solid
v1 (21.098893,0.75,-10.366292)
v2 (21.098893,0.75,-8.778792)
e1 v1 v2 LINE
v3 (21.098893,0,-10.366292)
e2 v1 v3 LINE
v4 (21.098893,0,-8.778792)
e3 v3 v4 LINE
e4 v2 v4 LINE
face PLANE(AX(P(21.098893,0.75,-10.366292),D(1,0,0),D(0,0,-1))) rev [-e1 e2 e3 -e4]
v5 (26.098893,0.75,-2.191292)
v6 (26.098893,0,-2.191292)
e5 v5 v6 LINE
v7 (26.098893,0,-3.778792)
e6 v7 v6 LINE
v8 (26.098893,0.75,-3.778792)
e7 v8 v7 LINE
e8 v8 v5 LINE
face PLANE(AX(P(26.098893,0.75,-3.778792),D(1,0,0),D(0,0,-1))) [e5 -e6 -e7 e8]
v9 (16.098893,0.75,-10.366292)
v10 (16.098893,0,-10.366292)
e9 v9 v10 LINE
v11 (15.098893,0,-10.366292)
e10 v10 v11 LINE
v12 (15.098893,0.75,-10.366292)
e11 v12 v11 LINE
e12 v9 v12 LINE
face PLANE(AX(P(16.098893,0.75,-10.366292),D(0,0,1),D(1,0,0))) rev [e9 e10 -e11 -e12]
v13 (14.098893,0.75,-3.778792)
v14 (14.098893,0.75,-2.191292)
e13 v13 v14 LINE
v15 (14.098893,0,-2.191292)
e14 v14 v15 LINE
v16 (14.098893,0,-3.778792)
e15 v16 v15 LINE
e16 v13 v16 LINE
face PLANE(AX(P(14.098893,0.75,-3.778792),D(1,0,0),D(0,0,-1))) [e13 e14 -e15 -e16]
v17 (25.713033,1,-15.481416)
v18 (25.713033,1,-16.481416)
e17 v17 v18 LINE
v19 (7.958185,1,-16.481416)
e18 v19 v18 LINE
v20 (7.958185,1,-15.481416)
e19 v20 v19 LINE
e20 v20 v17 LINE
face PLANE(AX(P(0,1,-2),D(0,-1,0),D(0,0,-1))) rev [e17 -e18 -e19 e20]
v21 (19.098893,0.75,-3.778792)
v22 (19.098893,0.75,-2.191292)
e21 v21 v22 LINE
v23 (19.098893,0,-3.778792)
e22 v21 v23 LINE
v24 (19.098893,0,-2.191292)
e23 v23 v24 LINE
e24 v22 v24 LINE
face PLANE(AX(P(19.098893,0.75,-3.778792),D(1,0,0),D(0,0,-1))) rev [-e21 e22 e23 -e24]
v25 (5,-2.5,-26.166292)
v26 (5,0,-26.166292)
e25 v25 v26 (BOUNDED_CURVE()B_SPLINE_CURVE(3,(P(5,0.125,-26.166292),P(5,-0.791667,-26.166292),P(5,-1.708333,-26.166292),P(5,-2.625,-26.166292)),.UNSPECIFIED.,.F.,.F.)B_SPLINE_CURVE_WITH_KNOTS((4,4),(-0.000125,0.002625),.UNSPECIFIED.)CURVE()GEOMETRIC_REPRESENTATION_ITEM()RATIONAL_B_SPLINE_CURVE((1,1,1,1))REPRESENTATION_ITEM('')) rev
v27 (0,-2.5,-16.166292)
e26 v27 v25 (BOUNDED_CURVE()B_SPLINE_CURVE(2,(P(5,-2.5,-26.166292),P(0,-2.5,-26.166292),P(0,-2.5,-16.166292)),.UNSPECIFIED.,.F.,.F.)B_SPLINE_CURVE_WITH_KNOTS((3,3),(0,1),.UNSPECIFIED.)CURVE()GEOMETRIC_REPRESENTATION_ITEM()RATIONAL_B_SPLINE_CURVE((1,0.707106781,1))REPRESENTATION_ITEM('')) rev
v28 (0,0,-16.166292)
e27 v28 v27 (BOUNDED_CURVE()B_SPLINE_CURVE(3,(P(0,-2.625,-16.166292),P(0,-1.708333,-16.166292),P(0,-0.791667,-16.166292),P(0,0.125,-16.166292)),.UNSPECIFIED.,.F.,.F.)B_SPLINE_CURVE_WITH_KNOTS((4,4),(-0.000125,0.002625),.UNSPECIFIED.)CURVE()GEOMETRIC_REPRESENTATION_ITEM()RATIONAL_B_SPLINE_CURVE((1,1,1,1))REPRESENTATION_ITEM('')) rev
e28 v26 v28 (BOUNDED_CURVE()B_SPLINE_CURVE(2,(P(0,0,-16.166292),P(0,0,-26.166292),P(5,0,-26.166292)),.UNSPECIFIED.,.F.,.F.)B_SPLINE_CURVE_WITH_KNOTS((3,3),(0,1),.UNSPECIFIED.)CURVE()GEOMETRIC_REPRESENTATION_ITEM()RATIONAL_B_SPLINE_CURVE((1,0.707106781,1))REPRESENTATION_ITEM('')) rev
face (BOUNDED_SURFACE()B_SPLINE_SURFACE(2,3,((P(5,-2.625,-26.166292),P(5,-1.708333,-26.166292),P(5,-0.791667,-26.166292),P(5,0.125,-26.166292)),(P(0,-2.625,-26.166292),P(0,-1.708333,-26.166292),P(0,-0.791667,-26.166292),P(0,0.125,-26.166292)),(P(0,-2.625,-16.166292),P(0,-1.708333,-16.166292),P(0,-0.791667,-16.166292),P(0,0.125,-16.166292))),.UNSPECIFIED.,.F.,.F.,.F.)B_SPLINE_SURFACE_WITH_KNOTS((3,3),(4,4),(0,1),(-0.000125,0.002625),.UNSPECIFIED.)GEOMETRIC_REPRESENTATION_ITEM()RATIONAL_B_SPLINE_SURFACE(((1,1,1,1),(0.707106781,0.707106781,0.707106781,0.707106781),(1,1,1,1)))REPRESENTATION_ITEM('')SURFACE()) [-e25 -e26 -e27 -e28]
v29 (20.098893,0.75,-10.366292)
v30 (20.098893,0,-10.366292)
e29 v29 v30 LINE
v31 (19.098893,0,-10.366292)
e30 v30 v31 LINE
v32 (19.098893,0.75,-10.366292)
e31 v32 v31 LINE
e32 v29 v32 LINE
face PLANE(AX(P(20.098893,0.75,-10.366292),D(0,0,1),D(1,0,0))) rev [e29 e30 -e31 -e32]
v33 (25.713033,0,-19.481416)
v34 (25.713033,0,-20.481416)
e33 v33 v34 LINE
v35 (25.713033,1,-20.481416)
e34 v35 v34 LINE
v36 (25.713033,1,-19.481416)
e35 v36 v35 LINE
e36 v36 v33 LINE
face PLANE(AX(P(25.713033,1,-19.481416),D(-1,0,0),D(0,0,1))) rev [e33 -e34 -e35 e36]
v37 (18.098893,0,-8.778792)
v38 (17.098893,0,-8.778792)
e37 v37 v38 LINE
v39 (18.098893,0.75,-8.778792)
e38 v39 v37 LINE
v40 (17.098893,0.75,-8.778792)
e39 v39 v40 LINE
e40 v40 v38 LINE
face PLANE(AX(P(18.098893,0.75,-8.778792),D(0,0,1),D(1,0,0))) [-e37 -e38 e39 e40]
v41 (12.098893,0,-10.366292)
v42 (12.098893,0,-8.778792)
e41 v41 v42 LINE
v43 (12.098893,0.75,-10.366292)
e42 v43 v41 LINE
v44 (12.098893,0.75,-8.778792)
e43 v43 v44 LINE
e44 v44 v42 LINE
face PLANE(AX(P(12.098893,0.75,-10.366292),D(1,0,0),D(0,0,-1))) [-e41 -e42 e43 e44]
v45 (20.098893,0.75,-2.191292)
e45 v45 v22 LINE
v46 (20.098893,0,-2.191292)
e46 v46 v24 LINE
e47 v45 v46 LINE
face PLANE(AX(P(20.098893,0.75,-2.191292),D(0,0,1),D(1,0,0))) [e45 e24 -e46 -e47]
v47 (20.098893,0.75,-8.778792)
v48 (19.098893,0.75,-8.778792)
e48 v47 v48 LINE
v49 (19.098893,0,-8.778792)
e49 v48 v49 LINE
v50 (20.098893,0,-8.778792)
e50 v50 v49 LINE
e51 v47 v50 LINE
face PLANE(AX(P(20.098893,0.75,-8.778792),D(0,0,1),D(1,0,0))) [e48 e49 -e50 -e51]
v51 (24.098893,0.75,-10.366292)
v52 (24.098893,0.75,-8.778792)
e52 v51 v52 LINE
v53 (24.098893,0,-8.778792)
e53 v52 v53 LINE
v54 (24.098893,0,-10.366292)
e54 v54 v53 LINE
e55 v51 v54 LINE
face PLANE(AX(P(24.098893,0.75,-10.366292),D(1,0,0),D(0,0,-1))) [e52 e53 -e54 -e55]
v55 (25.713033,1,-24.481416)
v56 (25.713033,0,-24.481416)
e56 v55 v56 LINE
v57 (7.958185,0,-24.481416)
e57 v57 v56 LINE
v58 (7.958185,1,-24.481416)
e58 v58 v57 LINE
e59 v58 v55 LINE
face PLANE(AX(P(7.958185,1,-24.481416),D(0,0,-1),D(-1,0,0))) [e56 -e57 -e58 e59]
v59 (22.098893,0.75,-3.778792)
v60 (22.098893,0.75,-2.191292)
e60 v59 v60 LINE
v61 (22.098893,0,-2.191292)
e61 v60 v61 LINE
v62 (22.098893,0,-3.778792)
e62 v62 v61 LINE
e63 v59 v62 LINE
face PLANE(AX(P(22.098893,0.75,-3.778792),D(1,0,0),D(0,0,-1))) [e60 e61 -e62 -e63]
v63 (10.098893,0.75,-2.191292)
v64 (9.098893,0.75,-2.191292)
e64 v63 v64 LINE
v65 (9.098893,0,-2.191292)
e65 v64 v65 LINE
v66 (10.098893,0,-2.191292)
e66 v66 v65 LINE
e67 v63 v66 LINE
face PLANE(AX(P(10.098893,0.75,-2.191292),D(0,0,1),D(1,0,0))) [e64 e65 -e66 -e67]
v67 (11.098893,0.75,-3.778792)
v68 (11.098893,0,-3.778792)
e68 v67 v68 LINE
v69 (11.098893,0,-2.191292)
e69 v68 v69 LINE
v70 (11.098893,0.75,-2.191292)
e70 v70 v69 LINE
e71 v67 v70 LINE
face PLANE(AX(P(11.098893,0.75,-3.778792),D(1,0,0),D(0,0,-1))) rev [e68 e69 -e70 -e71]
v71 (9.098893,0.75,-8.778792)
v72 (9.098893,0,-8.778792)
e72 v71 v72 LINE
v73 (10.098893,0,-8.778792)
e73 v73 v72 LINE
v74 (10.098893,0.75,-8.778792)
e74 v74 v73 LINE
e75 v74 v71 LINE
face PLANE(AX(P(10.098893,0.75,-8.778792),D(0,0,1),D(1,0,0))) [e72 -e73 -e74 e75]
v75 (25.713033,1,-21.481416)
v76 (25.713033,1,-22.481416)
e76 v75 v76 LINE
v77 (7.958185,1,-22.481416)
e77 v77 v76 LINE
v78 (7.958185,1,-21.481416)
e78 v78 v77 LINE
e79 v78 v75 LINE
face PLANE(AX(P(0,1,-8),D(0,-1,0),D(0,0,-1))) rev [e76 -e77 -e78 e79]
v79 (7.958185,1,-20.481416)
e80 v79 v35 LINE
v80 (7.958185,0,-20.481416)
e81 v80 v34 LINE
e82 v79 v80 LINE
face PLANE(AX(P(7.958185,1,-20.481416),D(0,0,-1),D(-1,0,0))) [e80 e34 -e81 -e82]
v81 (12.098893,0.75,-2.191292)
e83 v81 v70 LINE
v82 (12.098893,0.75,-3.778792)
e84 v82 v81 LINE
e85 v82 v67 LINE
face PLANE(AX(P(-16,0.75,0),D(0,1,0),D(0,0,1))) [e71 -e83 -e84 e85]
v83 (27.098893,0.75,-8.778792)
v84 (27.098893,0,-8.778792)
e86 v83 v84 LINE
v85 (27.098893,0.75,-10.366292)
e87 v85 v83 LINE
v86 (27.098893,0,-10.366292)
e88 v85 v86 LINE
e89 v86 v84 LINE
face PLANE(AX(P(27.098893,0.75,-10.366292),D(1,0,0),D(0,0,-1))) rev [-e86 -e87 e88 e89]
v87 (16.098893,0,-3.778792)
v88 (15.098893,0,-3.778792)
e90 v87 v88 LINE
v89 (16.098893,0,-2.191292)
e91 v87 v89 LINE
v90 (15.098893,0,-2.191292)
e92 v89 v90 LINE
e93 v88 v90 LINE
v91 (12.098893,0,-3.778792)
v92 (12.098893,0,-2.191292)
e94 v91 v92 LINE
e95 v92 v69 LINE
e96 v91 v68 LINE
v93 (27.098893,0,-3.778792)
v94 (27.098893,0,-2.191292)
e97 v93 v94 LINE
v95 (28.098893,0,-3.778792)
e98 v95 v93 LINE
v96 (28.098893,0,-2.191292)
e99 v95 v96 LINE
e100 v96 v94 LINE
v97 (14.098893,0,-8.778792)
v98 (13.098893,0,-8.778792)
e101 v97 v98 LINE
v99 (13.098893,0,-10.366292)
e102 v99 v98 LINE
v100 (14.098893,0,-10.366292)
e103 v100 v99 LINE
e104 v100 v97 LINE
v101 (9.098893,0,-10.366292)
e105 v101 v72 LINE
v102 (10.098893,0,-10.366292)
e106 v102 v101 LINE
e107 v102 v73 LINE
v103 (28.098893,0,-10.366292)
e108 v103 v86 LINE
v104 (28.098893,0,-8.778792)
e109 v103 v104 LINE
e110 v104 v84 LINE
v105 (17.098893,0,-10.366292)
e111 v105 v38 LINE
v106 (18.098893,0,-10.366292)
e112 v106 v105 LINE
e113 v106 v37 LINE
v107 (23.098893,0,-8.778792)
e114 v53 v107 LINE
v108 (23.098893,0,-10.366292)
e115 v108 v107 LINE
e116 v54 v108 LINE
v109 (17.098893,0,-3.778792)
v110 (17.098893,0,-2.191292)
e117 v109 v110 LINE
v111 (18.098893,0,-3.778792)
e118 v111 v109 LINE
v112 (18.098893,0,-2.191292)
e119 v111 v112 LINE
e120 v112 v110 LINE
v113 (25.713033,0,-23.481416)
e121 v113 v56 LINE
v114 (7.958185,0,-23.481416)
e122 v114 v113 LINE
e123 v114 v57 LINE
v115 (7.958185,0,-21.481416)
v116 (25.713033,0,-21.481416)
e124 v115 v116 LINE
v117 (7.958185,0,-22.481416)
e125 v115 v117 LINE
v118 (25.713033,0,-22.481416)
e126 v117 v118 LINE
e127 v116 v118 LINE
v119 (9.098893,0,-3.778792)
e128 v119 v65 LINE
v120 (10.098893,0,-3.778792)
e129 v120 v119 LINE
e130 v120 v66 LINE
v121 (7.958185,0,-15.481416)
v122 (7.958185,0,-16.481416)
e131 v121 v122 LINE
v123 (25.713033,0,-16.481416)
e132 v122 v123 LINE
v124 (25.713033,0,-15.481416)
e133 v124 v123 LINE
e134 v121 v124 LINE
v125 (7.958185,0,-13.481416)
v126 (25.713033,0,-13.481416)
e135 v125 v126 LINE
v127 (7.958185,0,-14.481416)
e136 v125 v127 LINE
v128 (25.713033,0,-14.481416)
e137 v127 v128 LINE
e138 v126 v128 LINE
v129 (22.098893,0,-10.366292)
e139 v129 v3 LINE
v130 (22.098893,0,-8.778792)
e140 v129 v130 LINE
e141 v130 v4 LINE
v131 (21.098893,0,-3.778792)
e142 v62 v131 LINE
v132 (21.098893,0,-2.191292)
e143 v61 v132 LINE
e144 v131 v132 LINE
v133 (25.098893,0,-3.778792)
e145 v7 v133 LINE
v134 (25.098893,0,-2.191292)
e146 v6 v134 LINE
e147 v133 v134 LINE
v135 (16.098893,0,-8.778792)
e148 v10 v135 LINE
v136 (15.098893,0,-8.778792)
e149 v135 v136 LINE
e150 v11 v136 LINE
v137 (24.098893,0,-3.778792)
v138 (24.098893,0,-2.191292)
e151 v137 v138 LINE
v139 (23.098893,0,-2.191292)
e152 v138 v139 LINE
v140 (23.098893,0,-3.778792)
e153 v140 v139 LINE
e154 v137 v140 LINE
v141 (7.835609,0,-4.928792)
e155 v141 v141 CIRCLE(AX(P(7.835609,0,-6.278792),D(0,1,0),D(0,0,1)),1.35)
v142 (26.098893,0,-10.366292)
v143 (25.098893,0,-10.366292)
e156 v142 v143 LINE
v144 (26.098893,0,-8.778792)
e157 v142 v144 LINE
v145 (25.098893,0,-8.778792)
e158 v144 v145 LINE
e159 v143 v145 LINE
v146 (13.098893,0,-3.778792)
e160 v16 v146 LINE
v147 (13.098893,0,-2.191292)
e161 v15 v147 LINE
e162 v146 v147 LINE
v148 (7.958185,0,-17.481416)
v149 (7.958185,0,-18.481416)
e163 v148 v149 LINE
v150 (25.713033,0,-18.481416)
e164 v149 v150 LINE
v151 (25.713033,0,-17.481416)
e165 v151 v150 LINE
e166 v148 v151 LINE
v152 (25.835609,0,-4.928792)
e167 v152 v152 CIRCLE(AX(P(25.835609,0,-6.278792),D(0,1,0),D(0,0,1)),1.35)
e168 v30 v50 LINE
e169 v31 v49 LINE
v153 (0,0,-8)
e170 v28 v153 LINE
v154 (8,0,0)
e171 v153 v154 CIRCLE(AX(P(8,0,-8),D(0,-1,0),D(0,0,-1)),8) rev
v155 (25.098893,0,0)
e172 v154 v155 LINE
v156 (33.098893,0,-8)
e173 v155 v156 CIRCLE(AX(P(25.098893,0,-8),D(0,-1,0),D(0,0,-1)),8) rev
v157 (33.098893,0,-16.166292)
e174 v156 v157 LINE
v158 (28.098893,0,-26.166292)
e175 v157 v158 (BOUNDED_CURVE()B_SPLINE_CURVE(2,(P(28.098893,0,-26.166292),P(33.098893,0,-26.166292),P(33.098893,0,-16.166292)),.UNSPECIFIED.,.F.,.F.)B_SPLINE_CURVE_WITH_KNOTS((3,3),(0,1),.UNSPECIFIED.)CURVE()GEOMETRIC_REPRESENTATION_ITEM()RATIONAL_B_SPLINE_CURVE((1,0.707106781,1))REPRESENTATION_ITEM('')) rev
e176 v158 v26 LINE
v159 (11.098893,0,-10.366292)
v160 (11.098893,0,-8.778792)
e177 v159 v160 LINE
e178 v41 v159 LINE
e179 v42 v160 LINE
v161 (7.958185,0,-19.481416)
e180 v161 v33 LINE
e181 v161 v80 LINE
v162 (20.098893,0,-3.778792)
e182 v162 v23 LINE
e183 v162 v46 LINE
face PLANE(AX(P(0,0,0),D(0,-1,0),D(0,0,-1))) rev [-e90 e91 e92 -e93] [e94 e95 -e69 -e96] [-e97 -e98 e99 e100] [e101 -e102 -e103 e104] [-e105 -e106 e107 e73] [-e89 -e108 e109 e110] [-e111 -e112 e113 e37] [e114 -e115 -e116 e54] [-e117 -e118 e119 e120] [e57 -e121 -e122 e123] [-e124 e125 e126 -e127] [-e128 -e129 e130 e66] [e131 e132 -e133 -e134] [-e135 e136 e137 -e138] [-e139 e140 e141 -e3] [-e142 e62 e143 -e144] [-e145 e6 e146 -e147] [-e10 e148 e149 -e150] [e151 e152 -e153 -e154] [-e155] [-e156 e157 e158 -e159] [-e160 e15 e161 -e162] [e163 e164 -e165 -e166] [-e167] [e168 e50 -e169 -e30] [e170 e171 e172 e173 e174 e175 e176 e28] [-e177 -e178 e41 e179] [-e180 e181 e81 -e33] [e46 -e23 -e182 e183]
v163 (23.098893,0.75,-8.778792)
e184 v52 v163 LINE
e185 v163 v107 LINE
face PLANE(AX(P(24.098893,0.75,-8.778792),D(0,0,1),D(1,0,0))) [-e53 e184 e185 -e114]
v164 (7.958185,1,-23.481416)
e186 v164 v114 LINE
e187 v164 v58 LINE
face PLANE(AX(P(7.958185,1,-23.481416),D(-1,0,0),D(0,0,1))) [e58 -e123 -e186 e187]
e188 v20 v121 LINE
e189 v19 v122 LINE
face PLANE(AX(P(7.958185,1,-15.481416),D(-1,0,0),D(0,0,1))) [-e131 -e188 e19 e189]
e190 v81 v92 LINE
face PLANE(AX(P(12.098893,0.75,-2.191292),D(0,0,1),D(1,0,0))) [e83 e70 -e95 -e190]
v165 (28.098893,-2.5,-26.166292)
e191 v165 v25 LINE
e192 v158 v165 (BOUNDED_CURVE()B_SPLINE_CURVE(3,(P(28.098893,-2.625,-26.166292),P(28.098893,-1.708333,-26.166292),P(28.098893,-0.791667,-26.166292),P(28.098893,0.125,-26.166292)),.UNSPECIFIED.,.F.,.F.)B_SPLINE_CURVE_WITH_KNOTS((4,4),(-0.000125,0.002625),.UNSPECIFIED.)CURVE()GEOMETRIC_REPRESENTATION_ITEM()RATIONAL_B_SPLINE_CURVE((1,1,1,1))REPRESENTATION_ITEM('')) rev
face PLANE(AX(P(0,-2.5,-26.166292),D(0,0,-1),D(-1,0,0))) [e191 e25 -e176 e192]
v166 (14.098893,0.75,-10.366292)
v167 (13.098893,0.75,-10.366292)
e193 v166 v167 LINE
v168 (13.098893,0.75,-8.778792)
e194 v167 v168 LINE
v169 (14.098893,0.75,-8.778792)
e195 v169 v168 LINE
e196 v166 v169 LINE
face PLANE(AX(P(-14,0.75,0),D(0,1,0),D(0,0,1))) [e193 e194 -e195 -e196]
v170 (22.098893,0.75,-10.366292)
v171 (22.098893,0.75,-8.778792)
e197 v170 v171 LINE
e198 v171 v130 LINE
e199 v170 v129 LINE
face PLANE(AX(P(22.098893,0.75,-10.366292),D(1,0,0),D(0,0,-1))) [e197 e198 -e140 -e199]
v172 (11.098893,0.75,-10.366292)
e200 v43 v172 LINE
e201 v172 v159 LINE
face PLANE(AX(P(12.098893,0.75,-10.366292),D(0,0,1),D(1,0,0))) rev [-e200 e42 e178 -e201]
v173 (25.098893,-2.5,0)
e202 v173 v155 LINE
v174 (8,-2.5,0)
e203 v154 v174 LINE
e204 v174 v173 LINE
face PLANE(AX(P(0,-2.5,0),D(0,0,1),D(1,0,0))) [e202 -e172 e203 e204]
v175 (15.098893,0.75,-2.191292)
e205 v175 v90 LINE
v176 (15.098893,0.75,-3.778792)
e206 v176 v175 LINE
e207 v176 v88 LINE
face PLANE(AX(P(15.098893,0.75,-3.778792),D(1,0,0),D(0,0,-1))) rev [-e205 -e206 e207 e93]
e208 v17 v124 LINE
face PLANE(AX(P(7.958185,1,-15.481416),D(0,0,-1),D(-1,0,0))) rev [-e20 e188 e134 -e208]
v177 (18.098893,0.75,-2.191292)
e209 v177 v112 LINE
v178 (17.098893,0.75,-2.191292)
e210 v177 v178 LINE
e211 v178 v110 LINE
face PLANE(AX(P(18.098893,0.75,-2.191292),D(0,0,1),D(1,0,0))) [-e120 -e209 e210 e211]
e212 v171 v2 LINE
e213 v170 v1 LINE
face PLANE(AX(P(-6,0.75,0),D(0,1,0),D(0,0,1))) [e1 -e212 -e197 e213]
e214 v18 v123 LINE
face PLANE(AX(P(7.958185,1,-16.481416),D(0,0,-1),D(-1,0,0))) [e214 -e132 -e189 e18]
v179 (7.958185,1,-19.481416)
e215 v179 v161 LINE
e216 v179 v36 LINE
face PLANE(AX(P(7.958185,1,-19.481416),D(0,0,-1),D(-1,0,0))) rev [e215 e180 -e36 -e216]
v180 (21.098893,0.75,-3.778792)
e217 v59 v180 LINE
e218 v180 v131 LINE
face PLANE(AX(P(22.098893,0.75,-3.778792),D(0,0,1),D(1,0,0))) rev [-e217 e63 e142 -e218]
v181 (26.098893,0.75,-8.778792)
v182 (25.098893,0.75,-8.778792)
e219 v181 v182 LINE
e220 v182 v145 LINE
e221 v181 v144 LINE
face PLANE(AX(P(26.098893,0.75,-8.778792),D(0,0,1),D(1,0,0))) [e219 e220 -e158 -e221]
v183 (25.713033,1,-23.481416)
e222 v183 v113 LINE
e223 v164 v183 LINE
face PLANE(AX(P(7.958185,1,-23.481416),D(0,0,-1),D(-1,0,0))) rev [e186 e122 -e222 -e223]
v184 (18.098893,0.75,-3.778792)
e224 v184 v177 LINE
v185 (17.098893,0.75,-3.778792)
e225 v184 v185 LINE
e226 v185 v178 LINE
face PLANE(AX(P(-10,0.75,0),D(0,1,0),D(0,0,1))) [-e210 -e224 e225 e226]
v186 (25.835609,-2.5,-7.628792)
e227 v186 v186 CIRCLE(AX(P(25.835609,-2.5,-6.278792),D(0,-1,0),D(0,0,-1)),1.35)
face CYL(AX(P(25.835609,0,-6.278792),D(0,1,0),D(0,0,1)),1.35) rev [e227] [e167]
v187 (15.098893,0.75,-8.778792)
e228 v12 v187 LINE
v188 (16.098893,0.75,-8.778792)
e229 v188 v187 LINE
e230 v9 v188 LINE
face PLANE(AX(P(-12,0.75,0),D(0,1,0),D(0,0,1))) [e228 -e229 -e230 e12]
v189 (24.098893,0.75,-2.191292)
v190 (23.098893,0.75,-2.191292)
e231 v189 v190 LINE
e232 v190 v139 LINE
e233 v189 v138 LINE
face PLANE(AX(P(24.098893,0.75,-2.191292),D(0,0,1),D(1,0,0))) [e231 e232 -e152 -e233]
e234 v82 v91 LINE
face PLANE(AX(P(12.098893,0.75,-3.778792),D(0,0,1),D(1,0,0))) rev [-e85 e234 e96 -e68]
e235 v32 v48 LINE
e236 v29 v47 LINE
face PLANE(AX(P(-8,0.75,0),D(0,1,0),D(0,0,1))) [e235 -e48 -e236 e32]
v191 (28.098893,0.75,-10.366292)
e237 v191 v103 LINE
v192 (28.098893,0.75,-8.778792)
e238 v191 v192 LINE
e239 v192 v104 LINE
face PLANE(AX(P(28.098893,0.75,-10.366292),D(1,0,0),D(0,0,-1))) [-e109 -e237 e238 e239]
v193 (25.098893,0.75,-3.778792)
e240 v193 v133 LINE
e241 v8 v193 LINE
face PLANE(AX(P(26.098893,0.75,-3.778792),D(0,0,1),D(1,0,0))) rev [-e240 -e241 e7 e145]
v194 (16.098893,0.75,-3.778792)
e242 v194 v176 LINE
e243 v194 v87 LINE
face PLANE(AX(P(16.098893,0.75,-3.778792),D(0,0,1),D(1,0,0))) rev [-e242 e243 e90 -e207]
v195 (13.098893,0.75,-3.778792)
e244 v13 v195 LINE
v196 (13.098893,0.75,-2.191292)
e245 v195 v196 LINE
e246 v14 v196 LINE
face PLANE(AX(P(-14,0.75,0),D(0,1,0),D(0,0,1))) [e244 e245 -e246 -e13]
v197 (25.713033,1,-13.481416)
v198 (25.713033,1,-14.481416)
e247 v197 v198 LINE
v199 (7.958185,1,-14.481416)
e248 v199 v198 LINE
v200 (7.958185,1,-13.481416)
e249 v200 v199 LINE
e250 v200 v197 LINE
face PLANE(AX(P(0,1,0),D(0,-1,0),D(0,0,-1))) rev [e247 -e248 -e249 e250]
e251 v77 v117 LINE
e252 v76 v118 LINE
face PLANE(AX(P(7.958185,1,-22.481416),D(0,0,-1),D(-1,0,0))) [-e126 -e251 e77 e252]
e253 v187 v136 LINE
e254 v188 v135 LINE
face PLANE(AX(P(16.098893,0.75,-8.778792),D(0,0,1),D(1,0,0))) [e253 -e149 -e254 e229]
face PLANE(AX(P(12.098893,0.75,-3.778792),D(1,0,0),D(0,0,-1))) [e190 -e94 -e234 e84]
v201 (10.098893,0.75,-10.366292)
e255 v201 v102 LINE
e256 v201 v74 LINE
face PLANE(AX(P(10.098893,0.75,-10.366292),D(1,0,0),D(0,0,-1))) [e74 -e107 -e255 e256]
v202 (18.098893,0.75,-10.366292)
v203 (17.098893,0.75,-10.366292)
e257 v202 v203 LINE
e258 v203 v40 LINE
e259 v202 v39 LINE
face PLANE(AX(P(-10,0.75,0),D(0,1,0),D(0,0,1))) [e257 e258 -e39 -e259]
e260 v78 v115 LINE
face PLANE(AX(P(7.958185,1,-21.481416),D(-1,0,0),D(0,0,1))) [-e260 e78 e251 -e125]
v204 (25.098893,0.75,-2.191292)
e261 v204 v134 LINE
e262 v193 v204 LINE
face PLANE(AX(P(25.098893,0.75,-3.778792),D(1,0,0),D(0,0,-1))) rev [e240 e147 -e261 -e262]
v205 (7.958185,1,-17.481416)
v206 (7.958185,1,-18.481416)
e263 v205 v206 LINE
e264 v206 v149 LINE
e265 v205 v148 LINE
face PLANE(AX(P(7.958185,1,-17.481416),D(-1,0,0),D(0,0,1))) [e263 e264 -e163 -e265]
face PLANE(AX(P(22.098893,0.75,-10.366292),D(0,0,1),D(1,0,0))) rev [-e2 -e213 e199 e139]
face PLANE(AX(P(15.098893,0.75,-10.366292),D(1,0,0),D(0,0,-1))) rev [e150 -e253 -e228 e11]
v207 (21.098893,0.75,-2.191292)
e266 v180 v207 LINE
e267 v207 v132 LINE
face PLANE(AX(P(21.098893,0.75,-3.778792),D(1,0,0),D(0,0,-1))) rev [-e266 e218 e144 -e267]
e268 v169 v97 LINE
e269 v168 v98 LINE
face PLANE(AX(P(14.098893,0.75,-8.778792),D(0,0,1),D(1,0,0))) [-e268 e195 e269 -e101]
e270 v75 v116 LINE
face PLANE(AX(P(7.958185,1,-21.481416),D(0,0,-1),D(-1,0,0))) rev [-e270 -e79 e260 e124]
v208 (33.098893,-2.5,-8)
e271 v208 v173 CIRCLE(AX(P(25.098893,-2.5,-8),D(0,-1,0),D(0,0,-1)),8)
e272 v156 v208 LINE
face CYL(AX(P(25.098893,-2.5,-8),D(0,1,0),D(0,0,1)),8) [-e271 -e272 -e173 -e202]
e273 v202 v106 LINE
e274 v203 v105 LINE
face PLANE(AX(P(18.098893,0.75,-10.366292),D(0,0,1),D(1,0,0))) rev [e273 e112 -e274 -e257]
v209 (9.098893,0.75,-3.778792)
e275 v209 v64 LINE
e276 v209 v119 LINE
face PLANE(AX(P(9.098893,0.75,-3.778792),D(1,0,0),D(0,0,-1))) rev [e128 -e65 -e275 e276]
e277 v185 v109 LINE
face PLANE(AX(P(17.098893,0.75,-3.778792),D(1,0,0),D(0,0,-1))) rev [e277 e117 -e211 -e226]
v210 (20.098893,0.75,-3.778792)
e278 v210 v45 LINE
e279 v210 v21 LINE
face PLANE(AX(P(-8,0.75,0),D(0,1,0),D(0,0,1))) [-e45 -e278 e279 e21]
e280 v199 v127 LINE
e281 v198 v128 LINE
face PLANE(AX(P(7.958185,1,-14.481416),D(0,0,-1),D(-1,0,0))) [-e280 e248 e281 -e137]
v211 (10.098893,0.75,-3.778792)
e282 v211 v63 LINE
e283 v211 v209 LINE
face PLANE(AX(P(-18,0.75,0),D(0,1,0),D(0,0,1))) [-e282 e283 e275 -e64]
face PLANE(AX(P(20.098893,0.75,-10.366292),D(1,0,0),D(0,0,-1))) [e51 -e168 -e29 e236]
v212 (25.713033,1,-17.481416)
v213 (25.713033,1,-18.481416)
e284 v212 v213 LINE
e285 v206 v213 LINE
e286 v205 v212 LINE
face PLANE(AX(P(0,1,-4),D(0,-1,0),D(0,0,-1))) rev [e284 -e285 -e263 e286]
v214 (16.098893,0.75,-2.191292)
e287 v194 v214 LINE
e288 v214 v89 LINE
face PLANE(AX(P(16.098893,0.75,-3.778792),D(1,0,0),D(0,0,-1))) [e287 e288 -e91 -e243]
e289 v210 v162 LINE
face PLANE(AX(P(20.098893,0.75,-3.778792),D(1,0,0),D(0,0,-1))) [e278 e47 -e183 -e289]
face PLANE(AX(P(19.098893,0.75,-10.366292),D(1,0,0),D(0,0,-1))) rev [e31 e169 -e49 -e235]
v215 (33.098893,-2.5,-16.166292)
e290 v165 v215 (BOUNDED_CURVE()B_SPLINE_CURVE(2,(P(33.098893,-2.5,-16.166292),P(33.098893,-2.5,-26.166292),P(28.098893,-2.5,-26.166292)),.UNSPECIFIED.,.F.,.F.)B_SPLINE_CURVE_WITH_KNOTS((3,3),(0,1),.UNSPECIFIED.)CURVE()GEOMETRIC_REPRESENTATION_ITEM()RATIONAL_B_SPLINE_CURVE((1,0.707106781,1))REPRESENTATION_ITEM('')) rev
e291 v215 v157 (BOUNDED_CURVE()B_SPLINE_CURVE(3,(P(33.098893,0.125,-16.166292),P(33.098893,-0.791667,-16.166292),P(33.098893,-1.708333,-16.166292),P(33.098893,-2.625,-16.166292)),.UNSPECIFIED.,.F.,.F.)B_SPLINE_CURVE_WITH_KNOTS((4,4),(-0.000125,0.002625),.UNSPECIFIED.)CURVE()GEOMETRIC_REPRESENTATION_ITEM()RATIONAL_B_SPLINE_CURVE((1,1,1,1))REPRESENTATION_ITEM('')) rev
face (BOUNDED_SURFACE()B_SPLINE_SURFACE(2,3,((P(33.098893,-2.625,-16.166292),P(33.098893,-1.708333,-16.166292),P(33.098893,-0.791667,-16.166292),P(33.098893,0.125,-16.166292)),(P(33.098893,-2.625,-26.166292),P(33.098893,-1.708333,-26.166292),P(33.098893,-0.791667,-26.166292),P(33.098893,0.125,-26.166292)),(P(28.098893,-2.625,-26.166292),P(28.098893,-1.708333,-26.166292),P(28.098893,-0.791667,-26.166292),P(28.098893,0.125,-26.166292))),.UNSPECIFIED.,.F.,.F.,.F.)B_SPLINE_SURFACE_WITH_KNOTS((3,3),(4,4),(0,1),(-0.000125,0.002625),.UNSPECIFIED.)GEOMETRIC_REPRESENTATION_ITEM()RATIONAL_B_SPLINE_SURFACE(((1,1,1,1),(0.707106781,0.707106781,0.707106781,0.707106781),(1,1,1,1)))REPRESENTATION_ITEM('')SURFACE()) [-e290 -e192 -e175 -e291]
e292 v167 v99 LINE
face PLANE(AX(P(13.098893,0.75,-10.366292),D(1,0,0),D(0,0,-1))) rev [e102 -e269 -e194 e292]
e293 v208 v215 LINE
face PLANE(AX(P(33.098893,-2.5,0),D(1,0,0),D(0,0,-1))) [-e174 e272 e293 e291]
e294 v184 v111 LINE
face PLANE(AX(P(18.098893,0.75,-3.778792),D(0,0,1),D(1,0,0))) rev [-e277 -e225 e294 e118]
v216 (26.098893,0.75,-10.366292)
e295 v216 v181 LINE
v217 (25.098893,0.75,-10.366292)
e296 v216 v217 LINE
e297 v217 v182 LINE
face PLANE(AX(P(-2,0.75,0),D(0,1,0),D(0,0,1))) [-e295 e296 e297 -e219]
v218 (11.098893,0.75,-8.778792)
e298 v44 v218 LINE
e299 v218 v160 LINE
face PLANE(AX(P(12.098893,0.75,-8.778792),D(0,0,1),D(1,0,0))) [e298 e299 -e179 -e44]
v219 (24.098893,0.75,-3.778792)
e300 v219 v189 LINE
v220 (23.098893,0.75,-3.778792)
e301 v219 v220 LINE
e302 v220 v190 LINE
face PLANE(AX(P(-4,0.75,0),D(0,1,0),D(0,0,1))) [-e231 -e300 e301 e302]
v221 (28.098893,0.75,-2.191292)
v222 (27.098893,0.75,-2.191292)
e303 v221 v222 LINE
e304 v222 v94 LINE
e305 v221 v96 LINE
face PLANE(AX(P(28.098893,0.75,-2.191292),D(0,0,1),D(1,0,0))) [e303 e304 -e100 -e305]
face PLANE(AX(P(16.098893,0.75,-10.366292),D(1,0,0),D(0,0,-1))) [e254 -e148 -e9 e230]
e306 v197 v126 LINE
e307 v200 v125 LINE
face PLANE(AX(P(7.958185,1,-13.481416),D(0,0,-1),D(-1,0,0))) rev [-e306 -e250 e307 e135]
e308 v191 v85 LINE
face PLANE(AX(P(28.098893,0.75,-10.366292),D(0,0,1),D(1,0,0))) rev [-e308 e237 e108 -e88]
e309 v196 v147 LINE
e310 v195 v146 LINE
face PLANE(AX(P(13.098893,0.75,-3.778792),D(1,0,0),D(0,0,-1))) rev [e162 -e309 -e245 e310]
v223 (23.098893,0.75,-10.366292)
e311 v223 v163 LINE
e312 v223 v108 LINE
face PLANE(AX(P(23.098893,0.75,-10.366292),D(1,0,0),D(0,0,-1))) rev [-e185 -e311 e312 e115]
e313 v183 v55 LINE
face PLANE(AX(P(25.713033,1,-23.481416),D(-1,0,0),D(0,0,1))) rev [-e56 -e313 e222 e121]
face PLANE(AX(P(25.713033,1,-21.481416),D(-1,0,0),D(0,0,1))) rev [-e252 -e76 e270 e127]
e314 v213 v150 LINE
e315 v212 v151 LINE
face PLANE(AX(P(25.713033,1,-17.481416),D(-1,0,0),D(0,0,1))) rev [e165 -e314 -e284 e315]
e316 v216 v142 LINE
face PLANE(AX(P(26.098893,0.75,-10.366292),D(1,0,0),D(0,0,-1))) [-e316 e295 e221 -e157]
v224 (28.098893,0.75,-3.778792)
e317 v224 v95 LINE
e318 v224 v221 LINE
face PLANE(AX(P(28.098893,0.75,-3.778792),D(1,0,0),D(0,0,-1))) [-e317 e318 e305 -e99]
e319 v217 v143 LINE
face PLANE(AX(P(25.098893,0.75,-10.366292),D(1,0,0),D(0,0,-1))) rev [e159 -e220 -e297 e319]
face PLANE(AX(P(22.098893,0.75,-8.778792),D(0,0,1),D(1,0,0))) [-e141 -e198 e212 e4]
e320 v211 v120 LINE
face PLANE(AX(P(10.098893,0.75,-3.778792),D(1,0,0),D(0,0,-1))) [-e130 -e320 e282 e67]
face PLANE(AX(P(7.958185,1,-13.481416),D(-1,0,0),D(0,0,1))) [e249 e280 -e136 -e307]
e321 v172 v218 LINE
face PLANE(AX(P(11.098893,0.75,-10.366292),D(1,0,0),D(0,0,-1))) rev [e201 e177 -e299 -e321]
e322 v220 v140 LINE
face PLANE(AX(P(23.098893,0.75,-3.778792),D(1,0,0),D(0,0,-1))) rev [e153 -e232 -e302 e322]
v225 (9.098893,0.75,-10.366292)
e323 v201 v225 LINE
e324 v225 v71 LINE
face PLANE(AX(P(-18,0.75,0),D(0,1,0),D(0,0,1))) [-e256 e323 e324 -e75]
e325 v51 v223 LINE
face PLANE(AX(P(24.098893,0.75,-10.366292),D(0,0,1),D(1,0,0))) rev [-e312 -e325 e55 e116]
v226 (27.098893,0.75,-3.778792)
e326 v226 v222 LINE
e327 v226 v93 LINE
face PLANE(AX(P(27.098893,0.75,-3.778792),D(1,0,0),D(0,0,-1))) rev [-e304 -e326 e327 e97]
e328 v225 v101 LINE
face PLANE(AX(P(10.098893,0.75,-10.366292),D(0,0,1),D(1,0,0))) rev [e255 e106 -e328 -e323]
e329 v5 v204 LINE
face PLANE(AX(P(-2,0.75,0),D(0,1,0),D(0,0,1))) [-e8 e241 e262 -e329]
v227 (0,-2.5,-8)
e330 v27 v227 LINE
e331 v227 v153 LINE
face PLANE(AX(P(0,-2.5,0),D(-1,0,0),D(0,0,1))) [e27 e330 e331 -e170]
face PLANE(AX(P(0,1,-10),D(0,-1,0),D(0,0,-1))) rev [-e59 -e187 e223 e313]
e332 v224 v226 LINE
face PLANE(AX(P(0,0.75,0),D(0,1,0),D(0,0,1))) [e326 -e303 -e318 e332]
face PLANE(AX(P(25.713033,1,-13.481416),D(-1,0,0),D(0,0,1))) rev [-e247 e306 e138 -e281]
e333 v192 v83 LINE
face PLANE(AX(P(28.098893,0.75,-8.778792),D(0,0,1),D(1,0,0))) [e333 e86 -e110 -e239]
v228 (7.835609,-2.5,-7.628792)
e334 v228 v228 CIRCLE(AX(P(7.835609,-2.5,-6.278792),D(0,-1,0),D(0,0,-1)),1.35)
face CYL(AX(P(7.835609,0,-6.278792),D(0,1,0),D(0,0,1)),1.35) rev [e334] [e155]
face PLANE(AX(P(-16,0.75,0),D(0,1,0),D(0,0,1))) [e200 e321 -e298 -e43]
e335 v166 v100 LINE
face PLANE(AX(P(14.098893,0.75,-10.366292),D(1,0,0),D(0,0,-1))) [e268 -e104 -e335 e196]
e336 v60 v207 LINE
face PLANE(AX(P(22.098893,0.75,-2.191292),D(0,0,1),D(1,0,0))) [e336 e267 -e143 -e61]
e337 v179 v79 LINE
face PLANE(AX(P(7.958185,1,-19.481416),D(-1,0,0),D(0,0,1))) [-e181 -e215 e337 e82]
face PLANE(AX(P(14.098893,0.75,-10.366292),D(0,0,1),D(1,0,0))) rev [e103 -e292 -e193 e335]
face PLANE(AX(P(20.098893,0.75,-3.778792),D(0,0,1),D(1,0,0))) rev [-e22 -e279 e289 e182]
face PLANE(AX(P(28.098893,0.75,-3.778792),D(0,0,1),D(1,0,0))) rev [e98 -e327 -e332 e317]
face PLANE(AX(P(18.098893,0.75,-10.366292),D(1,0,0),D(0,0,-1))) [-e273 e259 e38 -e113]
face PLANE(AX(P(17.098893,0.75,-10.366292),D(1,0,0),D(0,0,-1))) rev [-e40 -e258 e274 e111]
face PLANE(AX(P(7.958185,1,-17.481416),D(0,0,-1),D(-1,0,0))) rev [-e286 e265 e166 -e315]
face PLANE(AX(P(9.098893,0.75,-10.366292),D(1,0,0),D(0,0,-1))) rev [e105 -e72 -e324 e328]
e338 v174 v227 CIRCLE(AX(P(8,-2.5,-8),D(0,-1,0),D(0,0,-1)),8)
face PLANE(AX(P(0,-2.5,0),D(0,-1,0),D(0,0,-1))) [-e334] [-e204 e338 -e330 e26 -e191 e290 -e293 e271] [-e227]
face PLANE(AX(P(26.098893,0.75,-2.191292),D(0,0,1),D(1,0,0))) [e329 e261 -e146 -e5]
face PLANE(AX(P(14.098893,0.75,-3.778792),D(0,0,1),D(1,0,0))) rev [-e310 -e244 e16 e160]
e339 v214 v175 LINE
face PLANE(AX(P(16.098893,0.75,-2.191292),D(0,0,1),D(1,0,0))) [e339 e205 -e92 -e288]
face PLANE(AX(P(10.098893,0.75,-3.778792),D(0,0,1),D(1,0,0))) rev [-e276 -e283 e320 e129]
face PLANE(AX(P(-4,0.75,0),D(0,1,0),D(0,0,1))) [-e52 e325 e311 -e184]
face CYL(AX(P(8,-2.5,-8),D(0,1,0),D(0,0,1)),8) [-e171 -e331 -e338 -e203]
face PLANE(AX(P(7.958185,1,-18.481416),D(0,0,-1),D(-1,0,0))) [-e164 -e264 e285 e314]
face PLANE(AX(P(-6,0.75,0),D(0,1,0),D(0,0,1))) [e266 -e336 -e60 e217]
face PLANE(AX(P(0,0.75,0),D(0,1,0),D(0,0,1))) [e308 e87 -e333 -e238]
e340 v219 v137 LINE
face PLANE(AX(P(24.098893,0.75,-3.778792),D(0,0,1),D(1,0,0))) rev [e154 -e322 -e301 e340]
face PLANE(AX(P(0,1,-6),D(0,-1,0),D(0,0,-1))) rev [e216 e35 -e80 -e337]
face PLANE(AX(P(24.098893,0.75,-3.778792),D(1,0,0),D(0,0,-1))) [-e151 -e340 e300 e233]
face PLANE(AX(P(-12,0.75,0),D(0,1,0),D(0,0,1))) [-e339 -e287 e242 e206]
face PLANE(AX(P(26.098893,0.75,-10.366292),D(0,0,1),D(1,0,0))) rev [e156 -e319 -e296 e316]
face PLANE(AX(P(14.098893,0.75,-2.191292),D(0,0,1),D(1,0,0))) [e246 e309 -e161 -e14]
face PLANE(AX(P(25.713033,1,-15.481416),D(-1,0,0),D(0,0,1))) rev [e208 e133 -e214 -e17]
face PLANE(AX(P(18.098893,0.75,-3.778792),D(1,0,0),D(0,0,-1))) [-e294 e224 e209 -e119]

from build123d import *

# Parameters (mm, degrees)
SKETCH8_W                  = 33.098892865
SKETCH8_H                  = 26.166292272
BOSS_EXTRUDE5_DEPTH        = 2.5
M2_5_CLEARANCE_HOLE2_D     = 2.7
M2_5_CLEARANCE_HOLE2_DEPTH = 11.188838164
M2_5_CLEARANCE_HOLE2_TIP   = 0.811161836
SKETCH11_W                 = 1
SKETCH11_H                 = 1.5875
BOSS_EXTRUDE6_DEPTH        = 0.75
LPATTERN1_COUNT            = 10
LPATTERN1_PITCH            = 2
SKETCH11_4_W               = 17.754847744
SKETCH11_4_H               = 1
BOSS_EXTRUDE8_DEPTH        = 1
LPATTERN3_COUNT            = 6
LPATTERN3_PITCH            = 2
FILLET5_R                  = 8
FILLET8_SIZE               = 10
FILLET8_SIZE_2             = 5
FILLET9_SIZE               = 10
FILLET9_SIZE_2             = 5


with BuildPart() as part:
    # Sketch8 → Boss-Extrude5 (new body)
    with BuildSketch(Plane(origin=(0, 0, 0), x_dir=(1, 0, 0), z_dir=(0, 1, 0))):
        with Locations((16.549446433, 13.083146136)):
            Rectangle(SKETCH8_W, SKETCH8_H)
    extrude(amount=-BOSS_EXTRUDE5_DEPTH)

    # M2.5 Clearance Hole2
    with Locations(Plane(origin=(0, 0, 0), x_dir=(1, 0, 0), z_dir=(0, 1, 0))):
        with Locations((7.835608917, 6.278792272), (25.835608917, 6.278792272)):
            Hole(M2_5_CLEARANCE_HOLE2_D / 2, depth=M2_5_CLEARANCE_HOLE2_DEPTH)
            with Locations((0, 0, -(M2_5_CLEARANCE_HOLE2_DEPTH + M2_5_CLEARANCE_HOLE2_TIP / 2))):  # 118° drill point
                Cone(0, M2_5_CLEARANCE_HOLE2_D / 2, M2_5_CLEARANCE_HOLE2_TIP, mode=Mode.SUBTRACT)

    # Sketch11 → Boss-Extrude6 (add)
    with BuildSketch(Plane(origin=(0, 0, 0), x_dir=(1, 0, 0), z_dir=(0, 1, 0))):
        with Locations((27.598892865, 9.572542272)):
            Rectangle(SKETCH11_W, SKETCH11_H)
        with Locations((27.598892865, 2.985042272)):
            Rectangle(SKETCH11_W, SKETCH11_H)
    boss_extrude6 = extrude(amount=BOSS_EXTRUDE6_DEPTH)

    # LPattern1: Boss-Extrude6 ×10
    with Locations(*[(-i * LPATTERN1_PITCH, 0, 0) for i in range(1, LPATTERN1_COUNT)]):
        add(boss_extrude6)

    # Sketch11<4> → Boss-Extrude8 (add)
    with BuildSketch(Plane(origin=(0, 0, 0), x_dir=(1, 0, 0), z_dir=(0, 1, 0))):
        with Locations((16.835608917, 13.981416476)):
            Rectangle(SKETCH11_4_W, SKETCH11_4_H)
    boss_extrude8 = extrude(amount=BOSS_EXTRUDE8_DEPTH)

    # LPattern3: Boss-Extrude8 ×6
    with Locations(*[(0, 0, -i * LPATTERN3_PITCH) for i in range(1, LPATTERN3_COUNT)]):
        add(boss_extrude8)

    # Fillet5
    fillet5_edges = [part.edges().sort_by_distance(p)[0] for p in [
        (33.098892865, -1.25, 0),
        (0, -1.25, 0),
    ]]
    fillet(fillet5_edges, radius=FILLET5_R)

    # Fillet8
    # an asymmetric fillet: 10, 5 mm, written as the material it takes off along each edge
    with BuildSketch(Plane(origin=(33.098892865, 25, -26.166292272), x_dir=(0, 0, 1), z_dir=(0, -1, 0))) as fillet8_piece_1:
        with BuildLine():
            Bezier((FILLET8_SIZE, 0), (0, 0), (0, FILLET8_SIZE_2), weights=[1, 0.707106781, 1])
            Line((0, FILLET8_SIZE_2), (0, 0))
            Line((0, 0), (FILLET8_SIZE, 0))
        make_face()
    extrude(amount=52.5, mode=Mode.SUBTRACT)

    # Fillet9
    # an asymmetric fillet: 10, 5 mm, written as the material it takes off along each edge
    with BuildSketch(Plane(origin=(0, 25, -26.166292272), x_dir=(0, 0, 1), z_dir=(0, -1, 0))) as fillet9_piece_1:
        with BuildLine():
            Bezier((FILLET9_SIZE, 0), (0, 0), (0, -FILLET9_SIZE_2), weights=[1, 0.707106781, 1])
            Line((0, -FILLET9_SIZE_2), (0, 0))
            Line((0, 0), (FILLET9_SIZE, 0))
        make_face()
    extrude(amount=52.5, mode=Mode.SUBTRACT)


solid = part.part
